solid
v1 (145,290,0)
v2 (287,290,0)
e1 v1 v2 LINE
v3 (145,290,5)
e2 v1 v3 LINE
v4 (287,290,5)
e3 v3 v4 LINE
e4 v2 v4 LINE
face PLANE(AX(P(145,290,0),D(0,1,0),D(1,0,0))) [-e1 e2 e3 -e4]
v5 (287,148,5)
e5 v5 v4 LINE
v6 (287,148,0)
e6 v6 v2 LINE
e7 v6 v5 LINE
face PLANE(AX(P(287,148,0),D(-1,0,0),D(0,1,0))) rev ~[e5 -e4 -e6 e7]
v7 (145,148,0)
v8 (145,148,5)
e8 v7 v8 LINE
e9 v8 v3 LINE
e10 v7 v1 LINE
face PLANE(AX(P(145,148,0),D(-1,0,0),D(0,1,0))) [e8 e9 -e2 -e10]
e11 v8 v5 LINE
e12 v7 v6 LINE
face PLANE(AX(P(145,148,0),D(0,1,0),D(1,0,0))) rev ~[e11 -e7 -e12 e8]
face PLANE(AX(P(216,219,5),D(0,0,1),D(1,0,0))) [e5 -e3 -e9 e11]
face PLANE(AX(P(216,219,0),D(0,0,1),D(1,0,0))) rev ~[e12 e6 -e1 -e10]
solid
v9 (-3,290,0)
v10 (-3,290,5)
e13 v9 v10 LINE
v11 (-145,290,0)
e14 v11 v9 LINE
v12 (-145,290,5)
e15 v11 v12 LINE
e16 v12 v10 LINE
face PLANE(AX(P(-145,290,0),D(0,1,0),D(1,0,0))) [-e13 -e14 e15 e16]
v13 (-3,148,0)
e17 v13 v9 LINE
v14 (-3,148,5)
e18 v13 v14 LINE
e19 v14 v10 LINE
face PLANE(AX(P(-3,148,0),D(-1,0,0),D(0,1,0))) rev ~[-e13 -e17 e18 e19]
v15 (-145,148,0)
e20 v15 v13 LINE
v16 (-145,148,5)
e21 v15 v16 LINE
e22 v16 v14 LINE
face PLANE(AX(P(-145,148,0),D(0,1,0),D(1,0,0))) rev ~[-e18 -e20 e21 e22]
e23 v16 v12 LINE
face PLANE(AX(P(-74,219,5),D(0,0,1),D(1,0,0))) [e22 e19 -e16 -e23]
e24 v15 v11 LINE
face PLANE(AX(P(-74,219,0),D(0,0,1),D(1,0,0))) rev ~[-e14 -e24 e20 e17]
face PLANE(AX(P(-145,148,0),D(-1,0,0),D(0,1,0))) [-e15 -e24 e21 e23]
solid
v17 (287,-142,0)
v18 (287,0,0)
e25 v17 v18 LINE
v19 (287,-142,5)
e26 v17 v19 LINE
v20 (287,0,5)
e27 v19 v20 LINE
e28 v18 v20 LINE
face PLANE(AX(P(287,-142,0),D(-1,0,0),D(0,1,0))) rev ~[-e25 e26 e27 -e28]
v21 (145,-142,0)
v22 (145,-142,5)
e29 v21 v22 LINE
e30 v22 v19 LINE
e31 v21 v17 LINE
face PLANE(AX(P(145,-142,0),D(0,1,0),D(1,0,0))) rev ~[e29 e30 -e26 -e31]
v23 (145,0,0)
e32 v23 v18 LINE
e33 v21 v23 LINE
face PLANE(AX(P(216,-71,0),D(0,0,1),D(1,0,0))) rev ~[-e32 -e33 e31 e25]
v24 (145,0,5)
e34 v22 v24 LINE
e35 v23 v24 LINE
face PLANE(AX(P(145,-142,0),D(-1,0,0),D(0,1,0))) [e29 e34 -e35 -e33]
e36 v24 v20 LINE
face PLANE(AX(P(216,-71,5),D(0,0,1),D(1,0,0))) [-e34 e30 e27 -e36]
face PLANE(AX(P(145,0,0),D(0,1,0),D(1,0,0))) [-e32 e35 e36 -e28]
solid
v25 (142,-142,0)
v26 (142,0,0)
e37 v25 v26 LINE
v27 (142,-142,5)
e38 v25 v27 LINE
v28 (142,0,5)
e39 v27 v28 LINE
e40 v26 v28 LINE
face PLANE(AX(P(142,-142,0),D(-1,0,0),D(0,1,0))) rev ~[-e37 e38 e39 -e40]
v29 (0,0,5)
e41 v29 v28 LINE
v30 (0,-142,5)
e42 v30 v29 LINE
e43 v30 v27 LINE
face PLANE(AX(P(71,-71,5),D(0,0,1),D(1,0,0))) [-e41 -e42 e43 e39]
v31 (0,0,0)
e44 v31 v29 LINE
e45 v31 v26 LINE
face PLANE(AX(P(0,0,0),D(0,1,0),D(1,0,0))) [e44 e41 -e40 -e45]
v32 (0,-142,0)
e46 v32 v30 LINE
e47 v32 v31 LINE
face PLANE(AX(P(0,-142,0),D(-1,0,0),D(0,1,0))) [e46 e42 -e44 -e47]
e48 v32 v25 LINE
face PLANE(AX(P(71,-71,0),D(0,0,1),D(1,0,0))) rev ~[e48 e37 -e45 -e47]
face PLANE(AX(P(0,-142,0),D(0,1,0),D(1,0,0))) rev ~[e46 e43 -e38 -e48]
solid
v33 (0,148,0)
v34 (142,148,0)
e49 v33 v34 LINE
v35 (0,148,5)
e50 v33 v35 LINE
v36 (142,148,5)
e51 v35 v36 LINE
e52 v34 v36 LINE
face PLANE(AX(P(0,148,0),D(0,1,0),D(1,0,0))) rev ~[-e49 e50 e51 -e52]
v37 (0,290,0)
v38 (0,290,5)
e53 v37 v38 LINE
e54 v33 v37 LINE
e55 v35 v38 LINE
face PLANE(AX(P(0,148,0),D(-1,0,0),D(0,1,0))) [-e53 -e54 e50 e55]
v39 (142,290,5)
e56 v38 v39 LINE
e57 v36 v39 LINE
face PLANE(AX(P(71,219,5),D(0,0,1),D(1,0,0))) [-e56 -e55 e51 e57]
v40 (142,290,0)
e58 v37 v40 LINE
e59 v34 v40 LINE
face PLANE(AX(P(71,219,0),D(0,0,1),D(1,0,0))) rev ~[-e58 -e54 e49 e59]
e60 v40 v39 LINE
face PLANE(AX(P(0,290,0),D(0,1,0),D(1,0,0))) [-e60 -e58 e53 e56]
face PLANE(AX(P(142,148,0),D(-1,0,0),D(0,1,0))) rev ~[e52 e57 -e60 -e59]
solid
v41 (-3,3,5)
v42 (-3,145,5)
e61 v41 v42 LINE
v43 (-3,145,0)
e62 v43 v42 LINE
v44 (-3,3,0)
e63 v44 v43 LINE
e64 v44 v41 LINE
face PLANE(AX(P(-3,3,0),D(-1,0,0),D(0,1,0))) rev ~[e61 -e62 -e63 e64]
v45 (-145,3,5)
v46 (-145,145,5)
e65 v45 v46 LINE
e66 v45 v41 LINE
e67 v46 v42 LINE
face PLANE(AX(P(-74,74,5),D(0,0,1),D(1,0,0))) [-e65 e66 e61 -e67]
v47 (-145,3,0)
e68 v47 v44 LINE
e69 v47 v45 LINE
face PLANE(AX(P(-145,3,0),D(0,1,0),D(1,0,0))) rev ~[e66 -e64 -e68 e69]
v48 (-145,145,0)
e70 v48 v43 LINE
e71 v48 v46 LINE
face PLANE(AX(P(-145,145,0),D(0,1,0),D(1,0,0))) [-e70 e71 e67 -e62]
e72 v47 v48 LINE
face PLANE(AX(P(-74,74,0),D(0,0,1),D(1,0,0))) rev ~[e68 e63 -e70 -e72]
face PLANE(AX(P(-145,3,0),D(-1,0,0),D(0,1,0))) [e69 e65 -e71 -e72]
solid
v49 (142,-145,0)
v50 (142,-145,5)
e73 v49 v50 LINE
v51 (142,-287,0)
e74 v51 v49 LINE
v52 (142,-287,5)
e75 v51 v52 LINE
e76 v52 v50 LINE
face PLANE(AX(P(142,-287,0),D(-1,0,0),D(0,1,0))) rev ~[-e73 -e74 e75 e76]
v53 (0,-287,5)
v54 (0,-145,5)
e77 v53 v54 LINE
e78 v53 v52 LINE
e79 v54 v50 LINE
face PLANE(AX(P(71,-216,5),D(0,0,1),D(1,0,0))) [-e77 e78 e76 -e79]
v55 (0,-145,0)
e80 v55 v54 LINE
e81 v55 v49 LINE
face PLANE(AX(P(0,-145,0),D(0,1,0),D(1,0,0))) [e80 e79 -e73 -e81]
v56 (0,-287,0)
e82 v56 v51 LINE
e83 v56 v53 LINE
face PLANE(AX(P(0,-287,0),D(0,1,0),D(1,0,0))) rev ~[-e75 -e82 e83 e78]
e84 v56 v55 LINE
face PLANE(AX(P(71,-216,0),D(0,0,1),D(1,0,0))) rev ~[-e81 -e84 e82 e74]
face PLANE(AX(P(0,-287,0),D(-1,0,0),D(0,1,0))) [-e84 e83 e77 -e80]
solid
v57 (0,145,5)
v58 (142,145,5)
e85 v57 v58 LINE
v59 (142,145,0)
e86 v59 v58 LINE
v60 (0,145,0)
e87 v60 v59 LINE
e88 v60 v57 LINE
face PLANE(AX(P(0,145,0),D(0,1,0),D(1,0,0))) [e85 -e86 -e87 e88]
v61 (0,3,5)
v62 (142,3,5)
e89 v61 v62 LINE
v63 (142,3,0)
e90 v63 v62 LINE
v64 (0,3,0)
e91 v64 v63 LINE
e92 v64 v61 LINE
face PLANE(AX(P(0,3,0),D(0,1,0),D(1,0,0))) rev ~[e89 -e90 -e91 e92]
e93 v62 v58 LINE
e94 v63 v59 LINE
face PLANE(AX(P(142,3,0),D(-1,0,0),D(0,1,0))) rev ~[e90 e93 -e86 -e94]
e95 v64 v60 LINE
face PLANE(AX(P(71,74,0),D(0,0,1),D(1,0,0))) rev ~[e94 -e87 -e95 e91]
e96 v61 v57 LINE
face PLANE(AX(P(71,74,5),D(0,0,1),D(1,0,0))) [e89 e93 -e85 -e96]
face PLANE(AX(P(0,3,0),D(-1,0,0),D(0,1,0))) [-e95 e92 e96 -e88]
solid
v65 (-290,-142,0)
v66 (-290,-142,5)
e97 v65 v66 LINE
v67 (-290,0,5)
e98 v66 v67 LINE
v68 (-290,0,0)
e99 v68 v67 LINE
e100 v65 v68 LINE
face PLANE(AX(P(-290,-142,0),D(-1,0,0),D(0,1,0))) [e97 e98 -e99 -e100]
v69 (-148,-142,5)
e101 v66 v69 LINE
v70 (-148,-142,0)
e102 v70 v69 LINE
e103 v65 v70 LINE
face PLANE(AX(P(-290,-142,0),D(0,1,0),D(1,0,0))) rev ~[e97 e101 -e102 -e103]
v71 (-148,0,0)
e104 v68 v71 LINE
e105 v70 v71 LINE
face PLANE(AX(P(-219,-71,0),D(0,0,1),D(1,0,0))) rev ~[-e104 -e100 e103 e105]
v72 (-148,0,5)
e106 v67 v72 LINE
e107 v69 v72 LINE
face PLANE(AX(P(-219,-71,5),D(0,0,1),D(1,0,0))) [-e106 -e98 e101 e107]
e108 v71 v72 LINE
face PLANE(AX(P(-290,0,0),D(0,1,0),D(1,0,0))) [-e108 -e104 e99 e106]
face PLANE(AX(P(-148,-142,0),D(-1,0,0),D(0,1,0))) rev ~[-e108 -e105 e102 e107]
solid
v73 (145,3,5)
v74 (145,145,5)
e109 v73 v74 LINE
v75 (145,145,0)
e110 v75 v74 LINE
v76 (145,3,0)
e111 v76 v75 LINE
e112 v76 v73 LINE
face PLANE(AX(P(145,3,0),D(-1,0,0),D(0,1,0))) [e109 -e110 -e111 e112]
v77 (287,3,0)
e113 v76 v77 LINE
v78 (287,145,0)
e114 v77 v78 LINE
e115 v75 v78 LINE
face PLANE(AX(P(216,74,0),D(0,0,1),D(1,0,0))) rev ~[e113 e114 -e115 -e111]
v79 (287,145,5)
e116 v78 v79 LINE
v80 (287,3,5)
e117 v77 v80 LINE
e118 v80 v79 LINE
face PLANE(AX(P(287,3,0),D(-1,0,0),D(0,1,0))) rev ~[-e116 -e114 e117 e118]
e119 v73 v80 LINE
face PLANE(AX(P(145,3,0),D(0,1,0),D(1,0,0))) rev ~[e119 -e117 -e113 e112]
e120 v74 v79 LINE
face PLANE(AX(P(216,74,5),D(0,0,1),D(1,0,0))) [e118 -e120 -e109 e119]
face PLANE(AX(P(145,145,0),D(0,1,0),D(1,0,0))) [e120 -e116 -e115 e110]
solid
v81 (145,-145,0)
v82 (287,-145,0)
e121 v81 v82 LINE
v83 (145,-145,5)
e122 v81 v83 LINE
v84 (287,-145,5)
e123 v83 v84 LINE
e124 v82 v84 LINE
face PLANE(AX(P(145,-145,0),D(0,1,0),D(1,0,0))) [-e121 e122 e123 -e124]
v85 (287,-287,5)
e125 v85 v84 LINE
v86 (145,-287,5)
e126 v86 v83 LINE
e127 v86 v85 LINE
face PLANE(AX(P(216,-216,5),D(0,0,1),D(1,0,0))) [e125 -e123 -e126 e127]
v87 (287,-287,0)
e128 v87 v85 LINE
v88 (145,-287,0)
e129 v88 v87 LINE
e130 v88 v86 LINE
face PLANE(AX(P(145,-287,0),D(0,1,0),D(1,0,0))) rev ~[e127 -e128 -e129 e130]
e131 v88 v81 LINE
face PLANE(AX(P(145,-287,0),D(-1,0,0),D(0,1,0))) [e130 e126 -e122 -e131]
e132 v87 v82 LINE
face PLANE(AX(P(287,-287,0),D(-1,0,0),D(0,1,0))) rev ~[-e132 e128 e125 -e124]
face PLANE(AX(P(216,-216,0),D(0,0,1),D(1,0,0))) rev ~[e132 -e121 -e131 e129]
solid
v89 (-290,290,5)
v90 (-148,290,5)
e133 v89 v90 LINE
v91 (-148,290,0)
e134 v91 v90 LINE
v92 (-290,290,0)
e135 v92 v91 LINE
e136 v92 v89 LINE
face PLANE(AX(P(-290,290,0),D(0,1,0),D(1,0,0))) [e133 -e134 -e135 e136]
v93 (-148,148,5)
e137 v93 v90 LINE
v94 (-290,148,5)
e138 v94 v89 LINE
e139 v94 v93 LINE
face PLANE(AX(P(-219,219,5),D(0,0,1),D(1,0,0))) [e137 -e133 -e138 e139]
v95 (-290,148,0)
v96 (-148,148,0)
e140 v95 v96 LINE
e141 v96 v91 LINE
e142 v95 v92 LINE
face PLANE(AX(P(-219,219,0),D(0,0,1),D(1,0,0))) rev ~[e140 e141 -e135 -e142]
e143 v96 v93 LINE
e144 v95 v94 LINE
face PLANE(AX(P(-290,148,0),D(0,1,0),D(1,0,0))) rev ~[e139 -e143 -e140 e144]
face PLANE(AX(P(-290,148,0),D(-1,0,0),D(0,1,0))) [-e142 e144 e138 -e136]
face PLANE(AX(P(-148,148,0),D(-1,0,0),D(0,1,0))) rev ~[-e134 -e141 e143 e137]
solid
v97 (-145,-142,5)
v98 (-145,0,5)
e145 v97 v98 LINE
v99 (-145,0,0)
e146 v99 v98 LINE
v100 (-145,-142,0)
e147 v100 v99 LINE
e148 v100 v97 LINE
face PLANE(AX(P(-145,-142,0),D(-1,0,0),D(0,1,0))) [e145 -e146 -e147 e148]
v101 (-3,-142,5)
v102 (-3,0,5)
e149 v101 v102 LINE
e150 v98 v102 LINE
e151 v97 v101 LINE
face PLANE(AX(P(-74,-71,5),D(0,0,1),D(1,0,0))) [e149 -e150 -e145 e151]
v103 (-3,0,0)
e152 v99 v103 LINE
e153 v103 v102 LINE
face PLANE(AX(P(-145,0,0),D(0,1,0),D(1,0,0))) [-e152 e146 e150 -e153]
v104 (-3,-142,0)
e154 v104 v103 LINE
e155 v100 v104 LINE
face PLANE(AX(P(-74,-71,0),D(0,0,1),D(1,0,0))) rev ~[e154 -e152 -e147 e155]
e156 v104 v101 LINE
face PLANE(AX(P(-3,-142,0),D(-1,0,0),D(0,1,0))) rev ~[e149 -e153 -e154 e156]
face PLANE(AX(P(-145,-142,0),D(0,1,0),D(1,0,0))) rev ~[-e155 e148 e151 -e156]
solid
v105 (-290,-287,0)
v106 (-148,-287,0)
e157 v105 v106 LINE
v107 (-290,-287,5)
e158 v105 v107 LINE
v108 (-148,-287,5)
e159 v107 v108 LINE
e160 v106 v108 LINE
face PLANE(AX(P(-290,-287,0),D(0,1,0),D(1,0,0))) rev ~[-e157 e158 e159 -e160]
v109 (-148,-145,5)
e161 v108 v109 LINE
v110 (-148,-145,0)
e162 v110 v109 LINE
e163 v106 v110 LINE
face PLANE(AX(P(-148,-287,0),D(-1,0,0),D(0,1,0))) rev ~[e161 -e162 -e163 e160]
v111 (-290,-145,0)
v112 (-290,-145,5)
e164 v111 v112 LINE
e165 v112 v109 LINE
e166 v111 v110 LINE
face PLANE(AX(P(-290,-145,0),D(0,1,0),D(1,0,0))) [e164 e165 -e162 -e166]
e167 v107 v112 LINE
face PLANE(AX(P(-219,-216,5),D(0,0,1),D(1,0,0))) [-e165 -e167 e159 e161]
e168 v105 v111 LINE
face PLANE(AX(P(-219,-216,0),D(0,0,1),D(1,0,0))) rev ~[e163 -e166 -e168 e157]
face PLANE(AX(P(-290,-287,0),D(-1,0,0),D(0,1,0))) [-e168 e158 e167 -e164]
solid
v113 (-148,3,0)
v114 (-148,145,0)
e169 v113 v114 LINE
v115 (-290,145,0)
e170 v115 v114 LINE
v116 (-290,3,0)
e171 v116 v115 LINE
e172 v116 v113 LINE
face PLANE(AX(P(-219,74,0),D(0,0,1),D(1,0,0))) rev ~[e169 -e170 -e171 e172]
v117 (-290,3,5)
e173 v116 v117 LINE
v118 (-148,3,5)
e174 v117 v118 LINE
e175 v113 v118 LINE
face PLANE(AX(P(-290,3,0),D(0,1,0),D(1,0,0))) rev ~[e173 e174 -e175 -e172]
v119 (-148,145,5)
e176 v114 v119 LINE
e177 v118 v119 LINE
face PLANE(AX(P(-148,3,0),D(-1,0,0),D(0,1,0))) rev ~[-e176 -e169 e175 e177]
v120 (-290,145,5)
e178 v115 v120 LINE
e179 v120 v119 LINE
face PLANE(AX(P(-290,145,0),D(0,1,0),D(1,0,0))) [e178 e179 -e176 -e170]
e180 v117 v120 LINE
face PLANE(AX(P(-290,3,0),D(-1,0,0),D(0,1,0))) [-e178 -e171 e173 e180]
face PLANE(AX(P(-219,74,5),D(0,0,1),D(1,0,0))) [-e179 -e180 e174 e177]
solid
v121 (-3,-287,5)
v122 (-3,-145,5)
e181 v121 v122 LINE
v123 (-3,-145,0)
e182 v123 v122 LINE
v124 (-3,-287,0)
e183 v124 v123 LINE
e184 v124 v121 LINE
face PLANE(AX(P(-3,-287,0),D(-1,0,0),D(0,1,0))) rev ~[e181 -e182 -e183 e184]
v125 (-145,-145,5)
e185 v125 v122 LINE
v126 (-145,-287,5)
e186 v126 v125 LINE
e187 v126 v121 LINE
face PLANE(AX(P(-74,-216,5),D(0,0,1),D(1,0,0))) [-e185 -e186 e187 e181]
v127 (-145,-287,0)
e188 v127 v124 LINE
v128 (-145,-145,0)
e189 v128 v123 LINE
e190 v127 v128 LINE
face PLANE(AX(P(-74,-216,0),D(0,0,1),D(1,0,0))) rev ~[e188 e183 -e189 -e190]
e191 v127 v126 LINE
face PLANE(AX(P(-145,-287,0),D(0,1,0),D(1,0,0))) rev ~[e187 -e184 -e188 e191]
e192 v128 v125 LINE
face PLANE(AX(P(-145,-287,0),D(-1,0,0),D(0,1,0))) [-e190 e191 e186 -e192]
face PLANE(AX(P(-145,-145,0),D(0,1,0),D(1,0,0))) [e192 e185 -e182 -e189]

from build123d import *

# Parameters (mm, degrees)
F0_W     = 142
F0_H     = 142
F1_DEPTH = 5


# Not quite as in the source:
# - a feature names something its author has since deleted; it is built from what else it names


with BuildPart() as f1:
    # F0 (on Top) → F1 (new body)
    with BuildSketch(Plane.XY):
        with Locations((-219, -216)):
            Rectangle(F0_W, F0_H)
    extrude(amount=F1_DEPTH)


with BuildPart() as f1b:
    # F0 (on Top) → F1, piece 2 (new body)
    with BuildSketch(Plane.XY):
        with Locations((-219, -71)):
            Rectangle(F0_W, F0_H)
    extrude(amount=F1_DEPTH)


with BuildPart() as f1c:
    # F0 (on Top) → F1, piece 3 (new body)
    with BuildSketch(Plane.XY):
        with Locations((-219, 74)):
            Rectangle(F0_W, F0_H)
    extrude(amount=F1_DEPTH)


with BuildPart() as f1d:
    # F0 (on Top) → F1, piece 4 (new body)
    with BuildSketch(Plane.XY):
        with Locations((-219, 219)):
            Rectangle(F0_W, F0_H)
    extrude(amount=F1_DEPTH)


with BuildPart() as f1e:
    # F0 (on Top) → F1, piece 5 (new body)
    with BuildSketch(Plane.XY):
        with Locations((-74, 219)):
            Rectangle(F0_W, F0_H)
    extrude(amount=F1_DEPTH)


with BuildPart() as f1f:
    # F0 (on Top) → F1, piece 6 (new body)
    with BuildSketch(Plane.XY):
        with Locations((71, 219)):
            Rectangle(F0_W, F0_H)
    extrude(amount=F1_DEPTH)


with BuildPart() as f1g:
    # F0 (on Top) → F1, piece 7 (new body)
    with BuildSketch(Plane.XY):
        with Locations((216, 219)):
            Rectangle(F0_W, F0_H)
    extrude(amount=F1_DEPTH)


with BuildPart() as f1h:
    # F0 (on Top) → F1, piece 8 (new body)
    with BuildSketch(Plane.XY):
        with Locations((216, -71)):
            Rectangle(F0_W, F0_H)
    extrude(amount=F1_DEPTH)


with BuildPart() as f1i:
    # F0 (on Top) → F1, piece 9 (new body)
    with BuildSketch(Plane.XY):
        with Locations((71, -71)):
            Rectangle(F0_W, F0_H)
    extrude(amount=F1_DEPTH)


with BuildPart() as f1j:
    # F0 (on Top) → F1, piece 10 (new body)
    with BuildSketch(Plane.XY):
        with Locations((71, -216)):
            Rectangle(F0_W, F0_H)
    extrude(amount=F1_DEPTH)


with BuildPart() as f1k:
    # F0 (on Top) → F1, piece 11 (new body)
    with BuildSketch(Plane.XY):
        with Locations((216, -216)):
            Rectangle(F0_W, F0_H)
    extrude(amount=F1_DEPTH)


with BuildPart() as f1l:
    # F0 (on Top) → F1, piece 12 (new body)
    with BuildSketch(Plane.XY):
        with Locations((216, 74)):
            Rectangle(F0_W, F0_H)
    extrude(amount=F1_DEPTH)


with BuildPart() as f1m:
    # F0 (on Top) → F1, piece 13 (new body)
    with BuildSketch(Plane.XY):
        with Locations((71, 74)):
            Rectangle(F0_W, F0_H)
    extrude(amount=F1_DEPTH)


with BuildPart() as f1n:
    # F0 (on Top) → F1, piece 14 (new body)
    with BuildSketch(Plane.XY):
        with Locations((-74, 74)):
            Rectangle(F0_W, F0_H)
    extrude(amount=F1_DEPTH)


with BuildPart() as f1o:
    # F0 (on Top) → F1, piece 15 (new body)
    with BuildSketch(Plane.XY):
        with Locations((-74, -71)):
            Rectangle(F0_W, F0_H)
    extrude(amount=F1_DEPTH)


with BuildPart() as f1p:
    # F0 (on Top) → F1, piece 16 (new body)
    with BuildSketch(Plane.XY):
        with Locations((-74, -216)):
            Rectangle(F0_W, F0_H)
    extrude(amount=F1_DEPTH)


solid = Compound([f1.part, f1b.part, f1c.part, f1d.part, f1e.part, f1f.part, f1g.part, f1h.part, f1i.part, f1j.part, f1k.part, f1l.part, f1m.part, f1n.part, f1o.part, f1p.part])
